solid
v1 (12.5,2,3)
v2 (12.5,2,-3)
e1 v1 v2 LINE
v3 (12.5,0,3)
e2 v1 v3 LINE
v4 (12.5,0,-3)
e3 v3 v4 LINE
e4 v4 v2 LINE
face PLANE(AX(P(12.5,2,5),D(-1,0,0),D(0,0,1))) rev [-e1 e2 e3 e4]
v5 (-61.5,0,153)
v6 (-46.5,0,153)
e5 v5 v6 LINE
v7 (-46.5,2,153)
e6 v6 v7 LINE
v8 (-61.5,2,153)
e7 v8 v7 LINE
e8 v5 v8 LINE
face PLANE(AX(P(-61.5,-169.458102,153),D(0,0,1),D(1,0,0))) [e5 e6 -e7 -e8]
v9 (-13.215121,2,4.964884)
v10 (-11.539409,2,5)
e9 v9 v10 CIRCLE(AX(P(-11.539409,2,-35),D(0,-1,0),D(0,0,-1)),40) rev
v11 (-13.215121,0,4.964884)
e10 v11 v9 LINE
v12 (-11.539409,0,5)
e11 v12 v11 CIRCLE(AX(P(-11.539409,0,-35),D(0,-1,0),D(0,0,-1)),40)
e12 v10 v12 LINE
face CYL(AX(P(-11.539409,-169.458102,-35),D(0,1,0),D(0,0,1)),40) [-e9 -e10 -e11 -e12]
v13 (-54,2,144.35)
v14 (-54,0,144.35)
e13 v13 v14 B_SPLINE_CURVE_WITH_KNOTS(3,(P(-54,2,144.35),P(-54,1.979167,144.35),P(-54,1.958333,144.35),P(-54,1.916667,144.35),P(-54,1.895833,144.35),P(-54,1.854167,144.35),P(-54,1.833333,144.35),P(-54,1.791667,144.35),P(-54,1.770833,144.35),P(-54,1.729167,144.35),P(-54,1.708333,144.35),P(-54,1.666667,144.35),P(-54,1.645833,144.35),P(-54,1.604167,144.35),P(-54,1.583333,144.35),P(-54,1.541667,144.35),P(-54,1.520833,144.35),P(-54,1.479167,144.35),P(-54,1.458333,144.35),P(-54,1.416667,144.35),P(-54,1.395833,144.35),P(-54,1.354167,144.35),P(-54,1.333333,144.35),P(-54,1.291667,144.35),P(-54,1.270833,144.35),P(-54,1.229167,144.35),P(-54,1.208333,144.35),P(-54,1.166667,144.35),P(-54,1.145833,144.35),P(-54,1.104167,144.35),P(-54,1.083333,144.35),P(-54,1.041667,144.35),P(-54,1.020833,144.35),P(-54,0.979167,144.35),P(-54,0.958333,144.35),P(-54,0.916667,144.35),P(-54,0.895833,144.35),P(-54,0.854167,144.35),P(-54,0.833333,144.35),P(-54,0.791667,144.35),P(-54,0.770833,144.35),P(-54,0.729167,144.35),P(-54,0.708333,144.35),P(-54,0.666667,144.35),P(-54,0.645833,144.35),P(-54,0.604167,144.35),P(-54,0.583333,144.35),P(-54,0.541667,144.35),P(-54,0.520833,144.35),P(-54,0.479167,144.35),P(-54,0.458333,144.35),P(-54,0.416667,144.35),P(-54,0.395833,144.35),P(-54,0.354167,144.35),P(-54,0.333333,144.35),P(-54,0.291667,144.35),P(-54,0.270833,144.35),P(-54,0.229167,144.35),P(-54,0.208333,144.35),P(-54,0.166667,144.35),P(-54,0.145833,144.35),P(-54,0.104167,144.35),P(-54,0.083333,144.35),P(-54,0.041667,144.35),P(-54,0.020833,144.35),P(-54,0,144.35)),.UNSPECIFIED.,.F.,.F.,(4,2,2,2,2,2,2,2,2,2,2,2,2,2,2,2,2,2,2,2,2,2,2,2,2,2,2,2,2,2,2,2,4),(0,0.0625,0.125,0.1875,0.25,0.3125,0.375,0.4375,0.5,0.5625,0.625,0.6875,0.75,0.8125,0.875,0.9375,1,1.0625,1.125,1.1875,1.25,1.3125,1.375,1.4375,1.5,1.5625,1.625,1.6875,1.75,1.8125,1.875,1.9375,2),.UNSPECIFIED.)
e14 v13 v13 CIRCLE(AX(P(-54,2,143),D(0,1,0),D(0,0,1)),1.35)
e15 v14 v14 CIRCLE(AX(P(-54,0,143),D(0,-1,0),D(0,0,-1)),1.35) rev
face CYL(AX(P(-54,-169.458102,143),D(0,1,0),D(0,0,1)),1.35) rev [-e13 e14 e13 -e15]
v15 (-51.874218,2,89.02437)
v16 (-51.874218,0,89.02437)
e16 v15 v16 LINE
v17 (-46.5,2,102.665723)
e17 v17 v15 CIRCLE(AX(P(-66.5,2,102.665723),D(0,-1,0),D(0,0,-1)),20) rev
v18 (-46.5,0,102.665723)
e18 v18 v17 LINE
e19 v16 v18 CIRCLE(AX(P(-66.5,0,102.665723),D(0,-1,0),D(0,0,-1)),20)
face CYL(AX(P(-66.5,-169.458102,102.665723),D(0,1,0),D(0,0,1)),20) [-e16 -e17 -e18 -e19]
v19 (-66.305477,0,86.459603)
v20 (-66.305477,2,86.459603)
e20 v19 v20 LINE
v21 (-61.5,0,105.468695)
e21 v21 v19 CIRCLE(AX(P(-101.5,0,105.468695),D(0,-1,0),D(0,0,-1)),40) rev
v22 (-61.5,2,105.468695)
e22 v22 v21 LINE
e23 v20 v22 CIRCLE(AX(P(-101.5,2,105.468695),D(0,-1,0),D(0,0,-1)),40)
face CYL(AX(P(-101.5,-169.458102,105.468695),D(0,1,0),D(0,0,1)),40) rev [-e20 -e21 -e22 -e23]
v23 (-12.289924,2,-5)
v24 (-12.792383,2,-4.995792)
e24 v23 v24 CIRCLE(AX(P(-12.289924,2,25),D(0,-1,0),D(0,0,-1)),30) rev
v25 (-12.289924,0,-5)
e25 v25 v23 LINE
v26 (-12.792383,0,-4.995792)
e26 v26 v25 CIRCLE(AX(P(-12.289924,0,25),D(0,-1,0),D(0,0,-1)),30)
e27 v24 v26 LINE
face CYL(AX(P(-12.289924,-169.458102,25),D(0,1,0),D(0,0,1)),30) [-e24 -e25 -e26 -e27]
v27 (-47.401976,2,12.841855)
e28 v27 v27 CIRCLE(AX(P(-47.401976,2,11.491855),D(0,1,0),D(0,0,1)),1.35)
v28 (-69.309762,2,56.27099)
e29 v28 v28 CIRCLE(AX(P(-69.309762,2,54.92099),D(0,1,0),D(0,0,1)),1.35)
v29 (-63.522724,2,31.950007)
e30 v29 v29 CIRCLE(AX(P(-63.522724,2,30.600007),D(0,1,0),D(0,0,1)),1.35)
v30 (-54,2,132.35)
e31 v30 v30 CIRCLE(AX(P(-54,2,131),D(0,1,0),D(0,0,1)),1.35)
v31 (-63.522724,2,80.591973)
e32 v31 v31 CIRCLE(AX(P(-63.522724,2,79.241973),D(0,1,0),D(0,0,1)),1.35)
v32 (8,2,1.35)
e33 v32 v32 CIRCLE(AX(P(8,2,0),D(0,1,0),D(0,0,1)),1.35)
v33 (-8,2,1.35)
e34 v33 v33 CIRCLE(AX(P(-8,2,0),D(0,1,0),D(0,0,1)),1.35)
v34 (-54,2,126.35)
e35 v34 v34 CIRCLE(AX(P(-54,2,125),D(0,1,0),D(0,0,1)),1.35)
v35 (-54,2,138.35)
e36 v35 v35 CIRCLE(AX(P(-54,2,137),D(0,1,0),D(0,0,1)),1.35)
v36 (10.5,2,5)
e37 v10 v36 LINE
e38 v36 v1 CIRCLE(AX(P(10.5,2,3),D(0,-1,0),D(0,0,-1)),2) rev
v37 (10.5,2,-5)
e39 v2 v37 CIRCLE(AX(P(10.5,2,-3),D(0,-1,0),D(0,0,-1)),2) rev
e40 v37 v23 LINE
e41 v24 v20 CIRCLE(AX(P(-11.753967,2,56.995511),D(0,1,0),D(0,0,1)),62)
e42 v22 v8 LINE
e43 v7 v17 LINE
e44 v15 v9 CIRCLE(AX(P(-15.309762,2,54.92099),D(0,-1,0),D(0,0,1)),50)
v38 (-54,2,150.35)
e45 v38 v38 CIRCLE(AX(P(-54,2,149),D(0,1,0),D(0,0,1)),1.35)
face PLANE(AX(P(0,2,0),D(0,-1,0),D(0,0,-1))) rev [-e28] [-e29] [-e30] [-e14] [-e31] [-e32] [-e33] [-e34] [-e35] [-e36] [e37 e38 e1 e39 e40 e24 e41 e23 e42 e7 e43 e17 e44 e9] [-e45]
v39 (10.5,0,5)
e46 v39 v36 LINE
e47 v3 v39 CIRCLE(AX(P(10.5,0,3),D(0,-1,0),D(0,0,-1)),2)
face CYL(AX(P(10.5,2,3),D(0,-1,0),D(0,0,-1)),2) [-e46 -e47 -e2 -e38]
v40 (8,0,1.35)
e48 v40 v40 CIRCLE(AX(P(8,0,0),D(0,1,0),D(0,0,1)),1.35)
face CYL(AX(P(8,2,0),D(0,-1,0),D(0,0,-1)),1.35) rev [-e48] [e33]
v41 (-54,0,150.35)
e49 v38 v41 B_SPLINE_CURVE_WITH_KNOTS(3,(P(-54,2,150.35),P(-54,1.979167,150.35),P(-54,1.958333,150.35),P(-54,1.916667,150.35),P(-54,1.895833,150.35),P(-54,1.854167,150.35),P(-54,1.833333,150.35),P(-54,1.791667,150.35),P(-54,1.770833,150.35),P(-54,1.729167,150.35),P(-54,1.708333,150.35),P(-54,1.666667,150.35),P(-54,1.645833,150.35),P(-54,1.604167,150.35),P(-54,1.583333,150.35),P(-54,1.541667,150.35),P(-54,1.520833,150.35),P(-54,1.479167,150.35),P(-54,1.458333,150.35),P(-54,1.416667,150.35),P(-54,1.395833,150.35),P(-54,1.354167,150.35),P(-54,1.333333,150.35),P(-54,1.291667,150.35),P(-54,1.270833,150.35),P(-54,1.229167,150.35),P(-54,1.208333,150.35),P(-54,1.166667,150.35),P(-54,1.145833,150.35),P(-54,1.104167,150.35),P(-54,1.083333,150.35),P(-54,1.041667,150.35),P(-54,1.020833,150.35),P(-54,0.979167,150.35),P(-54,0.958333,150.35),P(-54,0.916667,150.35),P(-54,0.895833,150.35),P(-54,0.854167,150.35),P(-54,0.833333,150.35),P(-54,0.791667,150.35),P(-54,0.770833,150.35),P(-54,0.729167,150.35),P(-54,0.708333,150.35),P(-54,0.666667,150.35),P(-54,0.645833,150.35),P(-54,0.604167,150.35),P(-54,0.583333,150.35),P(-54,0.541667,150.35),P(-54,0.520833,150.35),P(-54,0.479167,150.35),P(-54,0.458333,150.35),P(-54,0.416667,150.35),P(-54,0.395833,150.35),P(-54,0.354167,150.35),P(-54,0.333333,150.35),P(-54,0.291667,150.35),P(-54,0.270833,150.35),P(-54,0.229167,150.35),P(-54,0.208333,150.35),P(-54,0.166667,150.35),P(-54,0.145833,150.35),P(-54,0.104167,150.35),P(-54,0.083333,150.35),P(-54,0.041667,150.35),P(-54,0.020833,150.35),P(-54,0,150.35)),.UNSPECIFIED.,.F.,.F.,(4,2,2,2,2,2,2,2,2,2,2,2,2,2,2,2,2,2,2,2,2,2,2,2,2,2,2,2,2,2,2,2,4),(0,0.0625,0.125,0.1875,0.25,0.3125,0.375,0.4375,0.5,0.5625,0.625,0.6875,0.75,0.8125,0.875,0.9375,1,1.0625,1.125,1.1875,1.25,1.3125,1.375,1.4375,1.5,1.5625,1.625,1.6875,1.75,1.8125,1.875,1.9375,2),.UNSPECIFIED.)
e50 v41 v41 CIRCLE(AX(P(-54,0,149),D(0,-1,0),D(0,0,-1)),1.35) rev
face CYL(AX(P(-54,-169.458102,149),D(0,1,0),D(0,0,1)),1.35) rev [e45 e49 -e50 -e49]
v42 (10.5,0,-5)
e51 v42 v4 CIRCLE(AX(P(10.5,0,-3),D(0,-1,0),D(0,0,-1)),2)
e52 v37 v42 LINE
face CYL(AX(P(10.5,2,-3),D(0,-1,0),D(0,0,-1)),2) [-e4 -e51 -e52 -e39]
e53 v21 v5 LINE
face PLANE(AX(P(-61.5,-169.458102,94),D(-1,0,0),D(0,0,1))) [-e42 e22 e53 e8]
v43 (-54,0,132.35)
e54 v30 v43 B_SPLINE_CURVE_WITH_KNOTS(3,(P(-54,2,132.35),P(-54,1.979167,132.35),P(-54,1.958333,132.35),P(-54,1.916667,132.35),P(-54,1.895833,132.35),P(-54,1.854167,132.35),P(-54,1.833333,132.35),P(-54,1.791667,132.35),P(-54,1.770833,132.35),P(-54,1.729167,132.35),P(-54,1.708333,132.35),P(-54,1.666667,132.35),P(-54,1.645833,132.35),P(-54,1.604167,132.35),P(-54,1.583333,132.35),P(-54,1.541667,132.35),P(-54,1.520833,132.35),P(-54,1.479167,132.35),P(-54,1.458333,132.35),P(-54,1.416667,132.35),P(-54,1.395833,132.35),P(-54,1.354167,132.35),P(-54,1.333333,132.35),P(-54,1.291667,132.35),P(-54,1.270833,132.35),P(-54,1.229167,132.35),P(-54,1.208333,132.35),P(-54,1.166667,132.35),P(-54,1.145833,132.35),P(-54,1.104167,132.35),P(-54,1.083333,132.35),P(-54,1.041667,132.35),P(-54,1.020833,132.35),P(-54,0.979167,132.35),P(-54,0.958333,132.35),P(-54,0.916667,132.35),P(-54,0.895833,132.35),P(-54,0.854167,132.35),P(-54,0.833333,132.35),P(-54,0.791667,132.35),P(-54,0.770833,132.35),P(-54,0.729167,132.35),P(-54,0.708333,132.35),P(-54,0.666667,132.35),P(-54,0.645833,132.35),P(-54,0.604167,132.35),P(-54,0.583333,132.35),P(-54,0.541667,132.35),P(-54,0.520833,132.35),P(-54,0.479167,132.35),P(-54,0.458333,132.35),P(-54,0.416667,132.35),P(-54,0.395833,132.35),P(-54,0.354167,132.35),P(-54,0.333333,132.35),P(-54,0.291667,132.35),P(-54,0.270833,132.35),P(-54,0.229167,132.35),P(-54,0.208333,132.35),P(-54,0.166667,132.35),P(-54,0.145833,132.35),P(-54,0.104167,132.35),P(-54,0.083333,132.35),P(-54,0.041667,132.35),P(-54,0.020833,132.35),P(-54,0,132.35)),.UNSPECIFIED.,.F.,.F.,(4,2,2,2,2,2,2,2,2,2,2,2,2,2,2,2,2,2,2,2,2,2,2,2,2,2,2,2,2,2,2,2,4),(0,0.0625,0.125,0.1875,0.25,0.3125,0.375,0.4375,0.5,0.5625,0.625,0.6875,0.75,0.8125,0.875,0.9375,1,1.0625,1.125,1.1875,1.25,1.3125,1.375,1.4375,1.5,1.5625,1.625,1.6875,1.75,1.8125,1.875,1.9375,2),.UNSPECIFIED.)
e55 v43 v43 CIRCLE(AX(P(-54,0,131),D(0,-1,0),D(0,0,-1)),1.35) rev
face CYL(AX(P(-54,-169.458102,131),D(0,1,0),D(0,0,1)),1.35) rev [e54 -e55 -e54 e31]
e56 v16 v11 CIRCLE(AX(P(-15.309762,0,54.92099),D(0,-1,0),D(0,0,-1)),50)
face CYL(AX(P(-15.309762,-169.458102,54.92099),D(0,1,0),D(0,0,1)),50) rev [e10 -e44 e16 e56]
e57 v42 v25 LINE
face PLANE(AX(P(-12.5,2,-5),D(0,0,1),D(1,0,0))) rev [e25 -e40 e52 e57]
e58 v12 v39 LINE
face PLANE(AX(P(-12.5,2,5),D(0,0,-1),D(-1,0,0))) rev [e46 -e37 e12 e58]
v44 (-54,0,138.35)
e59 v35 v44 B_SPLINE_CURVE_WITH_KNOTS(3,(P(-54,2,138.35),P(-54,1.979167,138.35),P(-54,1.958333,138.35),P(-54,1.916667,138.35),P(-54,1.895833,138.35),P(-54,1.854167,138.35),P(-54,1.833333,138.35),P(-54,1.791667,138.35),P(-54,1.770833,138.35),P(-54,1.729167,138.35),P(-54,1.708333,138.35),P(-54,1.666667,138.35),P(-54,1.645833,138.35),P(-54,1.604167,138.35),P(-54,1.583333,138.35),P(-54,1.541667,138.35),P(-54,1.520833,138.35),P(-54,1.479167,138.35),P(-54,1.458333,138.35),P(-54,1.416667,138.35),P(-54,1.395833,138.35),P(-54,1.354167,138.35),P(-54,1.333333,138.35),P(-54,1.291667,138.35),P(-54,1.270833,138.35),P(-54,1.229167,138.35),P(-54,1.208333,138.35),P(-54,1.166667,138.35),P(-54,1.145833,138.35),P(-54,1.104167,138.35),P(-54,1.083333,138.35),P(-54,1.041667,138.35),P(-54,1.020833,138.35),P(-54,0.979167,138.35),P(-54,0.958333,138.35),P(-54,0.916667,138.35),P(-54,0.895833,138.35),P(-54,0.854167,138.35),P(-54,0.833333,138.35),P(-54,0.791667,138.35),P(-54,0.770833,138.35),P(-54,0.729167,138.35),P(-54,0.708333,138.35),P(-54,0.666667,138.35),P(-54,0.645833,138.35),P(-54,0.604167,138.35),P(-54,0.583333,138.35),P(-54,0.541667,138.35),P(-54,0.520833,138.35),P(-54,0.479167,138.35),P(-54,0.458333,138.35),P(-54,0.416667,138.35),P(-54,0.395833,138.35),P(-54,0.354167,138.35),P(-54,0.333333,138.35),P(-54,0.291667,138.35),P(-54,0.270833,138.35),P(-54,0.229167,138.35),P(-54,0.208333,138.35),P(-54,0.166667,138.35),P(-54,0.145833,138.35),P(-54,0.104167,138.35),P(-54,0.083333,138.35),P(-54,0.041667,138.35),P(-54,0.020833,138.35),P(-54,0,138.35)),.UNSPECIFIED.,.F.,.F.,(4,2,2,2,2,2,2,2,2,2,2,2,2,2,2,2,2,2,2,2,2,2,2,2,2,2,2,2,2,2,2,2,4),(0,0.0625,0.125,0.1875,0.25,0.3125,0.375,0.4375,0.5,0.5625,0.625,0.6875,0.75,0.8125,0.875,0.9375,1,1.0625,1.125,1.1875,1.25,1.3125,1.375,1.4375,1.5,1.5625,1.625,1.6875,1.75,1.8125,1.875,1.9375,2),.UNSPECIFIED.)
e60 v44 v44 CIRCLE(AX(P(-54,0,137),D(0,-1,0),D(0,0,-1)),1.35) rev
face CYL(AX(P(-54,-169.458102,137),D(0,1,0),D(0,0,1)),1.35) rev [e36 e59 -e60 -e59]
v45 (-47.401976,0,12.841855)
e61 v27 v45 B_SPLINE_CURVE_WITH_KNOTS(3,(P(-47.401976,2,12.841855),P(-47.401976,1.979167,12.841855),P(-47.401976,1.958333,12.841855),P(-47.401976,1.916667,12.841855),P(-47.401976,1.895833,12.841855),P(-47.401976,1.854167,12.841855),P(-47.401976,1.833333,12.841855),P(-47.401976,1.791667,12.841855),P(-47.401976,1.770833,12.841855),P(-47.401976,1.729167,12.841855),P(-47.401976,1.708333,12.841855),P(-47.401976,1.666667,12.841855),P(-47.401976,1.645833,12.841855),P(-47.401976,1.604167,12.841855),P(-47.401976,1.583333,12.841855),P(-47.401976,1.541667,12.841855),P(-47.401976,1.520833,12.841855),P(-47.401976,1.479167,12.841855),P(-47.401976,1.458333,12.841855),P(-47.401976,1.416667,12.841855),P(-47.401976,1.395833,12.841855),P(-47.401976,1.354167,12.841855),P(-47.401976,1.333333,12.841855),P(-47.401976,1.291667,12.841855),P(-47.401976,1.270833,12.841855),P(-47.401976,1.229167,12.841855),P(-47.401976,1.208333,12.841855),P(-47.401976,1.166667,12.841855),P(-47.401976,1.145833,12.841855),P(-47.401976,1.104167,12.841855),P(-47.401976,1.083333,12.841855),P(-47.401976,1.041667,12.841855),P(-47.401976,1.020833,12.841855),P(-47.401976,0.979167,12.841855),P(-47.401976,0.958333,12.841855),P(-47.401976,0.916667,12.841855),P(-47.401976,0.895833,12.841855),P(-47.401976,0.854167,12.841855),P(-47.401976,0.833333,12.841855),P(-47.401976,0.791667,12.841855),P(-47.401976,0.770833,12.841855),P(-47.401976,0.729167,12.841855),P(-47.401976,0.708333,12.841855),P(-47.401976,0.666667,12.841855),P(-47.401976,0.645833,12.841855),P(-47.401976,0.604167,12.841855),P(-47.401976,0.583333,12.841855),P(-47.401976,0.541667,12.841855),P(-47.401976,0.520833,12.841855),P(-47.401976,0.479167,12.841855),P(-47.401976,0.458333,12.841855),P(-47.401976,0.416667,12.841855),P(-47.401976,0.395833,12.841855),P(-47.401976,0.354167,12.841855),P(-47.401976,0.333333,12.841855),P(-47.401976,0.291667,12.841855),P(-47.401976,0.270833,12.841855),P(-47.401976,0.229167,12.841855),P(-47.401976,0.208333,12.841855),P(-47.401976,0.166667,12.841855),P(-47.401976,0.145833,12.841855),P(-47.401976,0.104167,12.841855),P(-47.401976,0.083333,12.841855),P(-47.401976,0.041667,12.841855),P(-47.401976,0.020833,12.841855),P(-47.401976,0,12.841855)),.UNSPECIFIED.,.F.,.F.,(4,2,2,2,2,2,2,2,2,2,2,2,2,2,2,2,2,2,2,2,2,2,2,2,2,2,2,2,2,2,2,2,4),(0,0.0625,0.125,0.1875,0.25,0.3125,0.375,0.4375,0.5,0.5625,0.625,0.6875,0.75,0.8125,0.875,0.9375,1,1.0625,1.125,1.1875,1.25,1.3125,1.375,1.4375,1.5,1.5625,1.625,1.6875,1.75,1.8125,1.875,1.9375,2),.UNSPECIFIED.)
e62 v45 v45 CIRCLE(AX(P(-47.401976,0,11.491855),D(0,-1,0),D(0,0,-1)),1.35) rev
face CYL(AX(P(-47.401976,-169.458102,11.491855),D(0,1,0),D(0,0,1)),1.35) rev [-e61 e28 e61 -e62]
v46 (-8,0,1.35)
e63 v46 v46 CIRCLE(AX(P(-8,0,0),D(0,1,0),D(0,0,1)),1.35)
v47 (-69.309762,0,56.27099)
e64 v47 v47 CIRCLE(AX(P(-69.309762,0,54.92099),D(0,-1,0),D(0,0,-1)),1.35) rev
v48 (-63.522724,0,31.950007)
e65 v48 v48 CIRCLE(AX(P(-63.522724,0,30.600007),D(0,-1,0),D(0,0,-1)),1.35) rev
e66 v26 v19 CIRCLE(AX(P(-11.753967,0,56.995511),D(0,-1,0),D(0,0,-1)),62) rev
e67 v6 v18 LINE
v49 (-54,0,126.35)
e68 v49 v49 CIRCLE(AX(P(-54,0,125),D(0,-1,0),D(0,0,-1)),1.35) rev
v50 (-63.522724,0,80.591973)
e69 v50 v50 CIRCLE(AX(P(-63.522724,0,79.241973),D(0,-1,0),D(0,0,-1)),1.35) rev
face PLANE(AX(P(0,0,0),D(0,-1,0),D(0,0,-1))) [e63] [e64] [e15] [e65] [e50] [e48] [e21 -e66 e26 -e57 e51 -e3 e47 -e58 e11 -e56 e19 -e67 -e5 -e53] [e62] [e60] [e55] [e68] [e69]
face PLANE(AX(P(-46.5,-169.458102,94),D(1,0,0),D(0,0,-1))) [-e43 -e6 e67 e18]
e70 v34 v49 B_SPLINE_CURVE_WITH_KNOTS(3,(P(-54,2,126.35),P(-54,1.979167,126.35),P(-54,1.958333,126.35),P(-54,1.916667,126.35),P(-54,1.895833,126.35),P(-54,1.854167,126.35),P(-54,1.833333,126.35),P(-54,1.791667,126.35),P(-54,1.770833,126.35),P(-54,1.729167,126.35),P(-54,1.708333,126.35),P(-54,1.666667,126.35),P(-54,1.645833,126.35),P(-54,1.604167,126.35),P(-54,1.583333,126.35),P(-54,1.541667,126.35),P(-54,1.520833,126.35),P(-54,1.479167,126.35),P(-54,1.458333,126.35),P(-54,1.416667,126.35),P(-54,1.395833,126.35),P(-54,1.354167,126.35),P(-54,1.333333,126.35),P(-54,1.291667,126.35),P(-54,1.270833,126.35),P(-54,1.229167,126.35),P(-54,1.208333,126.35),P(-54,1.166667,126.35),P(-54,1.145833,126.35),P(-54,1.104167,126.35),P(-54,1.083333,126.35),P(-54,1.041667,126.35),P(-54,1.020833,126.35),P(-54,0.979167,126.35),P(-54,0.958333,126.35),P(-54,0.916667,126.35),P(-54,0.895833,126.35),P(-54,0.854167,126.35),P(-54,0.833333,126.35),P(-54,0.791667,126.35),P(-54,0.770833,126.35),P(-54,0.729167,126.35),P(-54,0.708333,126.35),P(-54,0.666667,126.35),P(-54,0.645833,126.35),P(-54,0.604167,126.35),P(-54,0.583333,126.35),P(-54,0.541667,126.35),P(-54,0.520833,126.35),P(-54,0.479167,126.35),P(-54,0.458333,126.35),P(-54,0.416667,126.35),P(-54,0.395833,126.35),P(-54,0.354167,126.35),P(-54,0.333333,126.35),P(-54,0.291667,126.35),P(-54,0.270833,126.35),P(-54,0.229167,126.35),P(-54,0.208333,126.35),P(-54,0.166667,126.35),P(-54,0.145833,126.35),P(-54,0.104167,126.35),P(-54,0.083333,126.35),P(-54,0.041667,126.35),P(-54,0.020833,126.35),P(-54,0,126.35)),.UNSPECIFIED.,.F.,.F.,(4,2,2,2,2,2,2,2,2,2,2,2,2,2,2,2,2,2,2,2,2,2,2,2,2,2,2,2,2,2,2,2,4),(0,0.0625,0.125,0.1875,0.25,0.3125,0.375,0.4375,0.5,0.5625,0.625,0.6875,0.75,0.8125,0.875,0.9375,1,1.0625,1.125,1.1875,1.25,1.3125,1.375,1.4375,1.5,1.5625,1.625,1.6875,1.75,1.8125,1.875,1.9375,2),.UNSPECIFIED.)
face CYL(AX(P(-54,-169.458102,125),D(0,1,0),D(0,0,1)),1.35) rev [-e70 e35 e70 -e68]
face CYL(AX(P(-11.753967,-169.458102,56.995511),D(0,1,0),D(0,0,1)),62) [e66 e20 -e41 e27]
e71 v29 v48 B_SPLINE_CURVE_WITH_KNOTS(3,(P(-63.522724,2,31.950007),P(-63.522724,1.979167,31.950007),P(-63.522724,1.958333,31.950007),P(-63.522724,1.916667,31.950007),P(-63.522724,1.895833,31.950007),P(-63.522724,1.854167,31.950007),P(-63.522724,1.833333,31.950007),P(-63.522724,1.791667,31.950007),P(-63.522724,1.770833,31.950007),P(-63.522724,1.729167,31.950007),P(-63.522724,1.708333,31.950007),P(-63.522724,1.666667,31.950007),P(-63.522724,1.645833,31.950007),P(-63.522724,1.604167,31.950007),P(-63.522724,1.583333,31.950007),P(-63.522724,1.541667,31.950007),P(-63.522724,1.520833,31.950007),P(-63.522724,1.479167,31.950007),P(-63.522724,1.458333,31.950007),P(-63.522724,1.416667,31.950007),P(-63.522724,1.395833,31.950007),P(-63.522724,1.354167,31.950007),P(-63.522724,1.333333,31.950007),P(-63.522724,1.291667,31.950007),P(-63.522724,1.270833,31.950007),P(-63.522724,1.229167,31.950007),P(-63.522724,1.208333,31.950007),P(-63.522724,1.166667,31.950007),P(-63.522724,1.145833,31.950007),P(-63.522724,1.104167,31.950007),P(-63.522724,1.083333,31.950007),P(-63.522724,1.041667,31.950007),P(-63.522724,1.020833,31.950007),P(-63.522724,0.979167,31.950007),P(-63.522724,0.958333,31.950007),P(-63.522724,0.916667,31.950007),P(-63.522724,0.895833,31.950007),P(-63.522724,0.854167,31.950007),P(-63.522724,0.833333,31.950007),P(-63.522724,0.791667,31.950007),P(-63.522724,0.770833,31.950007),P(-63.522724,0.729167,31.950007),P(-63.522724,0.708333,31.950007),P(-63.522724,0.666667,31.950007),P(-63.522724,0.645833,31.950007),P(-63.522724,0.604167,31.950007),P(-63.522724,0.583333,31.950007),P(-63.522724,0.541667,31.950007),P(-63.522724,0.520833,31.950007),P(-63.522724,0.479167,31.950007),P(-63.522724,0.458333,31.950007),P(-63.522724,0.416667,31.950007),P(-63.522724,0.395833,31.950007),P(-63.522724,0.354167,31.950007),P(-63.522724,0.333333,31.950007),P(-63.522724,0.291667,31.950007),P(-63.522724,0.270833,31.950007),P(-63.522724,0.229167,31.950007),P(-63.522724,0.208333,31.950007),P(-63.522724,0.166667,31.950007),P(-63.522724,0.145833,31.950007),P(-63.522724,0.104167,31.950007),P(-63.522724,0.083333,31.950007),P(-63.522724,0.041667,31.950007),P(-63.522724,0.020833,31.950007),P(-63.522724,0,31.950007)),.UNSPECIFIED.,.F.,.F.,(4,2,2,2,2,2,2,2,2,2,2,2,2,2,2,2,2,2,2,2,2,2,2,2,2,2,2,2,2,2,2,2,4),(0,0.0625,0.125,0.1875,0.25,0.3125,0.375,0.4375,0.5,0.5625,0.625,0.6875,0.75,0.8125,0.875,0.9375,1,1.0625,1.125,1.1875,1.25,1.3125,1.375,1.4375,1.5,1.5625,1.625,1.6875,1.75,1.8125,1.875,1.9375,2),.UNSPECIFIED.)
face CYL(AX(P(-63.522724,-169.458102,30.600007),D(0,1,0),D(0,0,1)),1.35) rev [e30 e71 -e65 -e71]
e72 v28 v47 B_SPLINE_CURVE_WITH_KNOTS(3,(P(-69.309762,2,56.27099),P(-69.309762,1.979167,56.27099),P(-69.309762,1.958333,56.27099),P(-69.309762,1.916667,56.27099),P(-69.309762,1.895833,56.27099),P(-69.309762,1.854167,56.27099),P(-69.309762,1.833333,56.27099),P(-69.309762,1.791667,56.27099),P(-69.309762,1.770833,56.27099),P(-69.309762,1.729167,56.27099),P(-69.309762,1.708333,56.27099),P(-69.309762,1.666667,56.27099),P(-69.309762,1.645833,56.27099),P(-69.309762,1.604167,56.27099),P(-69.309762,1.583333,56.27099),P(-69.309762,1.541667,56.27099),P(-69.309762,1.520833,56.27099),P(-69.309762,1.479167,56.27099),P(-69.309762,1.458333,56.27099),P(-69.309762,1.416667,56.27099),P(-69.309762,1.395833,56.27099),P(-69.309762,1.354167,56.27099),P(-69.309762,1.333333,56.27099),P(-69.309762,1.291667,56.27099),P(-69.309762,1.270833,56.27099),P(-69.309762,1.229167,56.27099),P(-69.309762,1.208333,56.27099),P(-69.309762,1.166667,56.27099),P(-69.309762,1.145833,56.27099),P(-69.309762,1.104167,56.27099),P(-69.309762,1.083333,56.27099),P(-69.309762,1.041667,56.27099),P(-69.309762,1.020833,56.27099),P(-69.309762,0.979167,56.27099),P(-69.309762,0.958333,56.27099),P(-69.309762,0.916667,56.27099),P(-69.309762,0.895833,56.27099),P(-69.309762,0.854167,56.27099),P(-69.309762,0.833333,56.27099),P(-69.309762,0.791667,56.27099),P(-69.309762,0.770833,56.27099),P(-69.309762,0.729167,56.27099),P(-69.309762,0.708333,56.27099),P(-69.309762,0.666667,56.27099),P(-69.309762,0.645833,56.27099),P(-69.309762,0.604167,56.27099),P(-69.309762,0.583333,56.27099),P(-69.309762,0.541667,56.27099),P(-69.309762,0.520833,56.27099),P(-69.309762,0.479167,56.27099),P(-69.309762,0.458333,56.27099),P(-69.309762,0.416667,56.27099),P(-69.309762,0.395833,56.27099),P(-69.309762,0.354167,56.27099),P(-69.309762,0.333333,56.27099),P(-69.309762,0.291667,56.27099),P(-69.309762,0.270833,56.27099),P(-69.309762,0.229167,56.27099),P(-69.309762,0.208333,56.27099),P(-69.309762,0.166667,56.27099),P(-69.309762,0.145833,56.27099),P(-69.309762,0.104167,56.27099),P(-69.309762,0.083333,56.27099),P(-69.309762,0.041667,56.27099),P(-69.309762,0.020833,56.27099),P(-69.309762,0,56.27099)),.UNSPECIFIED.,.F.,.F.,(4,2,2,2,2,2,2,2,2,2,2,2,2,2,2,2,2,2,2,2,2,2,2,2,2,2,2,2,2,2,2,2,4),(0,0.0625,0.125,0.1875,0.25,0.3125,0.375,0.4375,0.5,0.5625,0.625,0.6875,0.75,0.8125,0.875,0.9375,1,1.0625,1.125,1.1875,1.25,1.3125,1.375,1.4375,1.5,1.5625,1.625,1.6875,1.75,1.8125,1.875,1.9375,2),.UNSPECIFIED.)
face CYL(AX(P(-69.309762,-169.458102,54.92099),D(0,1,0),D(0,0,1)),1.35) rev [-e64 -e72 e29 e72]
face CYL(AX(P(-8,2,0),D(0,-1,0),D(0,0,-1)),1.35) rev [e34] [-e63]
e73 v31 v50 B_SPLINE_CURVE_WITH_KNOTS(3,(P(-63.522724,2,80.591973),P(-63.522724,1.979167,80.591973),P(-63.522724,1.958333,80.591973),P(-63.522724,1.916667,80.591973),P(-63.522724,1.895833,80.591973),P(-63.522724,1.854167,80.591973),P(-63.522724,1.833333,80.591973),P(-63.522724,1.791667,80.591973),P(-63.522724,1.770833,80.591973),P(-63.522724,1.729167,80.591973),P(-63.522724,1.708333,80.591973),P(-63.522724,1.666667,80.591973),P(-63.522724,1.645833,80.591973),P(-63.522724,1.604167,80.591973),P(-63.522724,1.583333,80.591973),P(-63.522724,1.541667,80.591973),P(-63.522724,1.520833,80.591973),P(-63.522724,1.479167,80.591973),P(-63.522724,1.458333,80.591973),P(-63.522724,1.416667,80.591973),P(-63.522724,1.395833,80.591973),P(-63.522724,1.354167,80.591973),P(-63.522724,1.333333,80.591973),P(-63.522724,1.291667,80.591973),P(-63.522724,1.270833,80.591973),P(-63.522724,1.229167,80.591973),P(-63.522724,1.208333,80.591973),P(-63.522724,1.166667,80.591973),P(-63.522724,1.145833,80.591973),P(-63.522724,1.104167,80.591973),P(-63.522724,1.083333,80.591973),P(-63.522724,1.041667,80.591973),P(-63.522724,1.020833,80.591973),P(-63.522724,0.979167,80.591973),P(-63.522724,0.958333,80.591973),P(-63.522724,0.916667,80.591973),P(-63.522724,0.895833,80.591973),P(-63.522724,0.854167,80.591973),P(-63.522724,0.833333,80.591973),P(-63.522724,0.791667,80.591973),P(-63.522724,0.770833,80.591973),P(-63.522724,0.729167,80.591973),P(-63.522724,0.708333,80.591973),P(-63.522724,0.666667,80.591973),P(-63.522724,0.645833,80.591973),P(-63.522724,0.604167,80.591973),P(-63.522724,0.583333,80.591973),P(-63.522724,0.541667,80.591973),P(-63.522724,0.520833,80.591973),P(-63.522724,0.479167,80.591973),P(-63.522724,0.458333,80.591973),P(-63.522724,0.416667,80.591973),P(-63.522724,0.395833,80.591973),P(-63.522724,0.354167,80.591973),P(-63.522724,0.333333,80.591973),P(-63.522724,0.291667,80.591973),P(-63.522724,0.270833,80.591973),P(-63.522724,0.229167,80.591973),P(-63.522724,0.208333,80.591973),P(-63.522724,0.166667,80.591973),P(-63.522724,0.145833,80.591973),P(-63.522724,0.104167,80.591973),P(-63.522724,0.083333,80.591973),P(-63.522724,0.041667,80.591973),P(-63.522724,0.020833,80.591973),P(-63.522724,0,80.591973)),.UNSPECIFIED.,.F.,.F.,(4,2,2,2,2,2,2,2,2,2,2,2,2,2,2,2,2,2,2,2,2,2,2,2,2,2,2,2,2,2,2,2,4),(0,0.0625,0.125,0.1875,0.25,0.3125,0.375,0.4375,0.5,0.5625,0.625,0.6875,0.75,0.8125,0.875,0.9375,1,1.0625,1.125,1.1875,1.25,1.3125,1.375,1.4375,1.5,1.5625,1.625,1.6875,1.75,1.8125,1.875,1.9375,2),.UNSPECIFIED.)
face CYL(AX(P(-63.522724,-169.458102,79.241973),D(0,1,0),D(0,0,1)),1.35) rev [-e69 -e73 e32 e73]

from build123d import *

# Parameters (mm, degrees)
SKETCH_1_W      = 25
SKETCH_1_H      = 10
SKETCH_1_R      = 1.35
EXTRUDE_1_DEPTH = 2
SKETCH_3_R      = 1.35
EXTRUDE_2_DEPTH = 2
FILLET_2_R      = 40
FILLET_2_R_2    = 20
FILLET_2_R_3    = 30
FILLET_4_R      = 2


with BuildPart() as part:
    # 草图1 → 凸台-拉伸1 (new body)
    with BuildSketch(Plane(origin=(0, 0, 0), x_dir=(1, 0, 0), z_dir=(0, 1, 0))):
        Rectangle(SKETCH_1_W, SKETCH_1_H)
        with Locations(Location((8, 0, 0), (0, 0, 270))):
            Circle(SKETCH_1_R, mode=Mode.SUBTRACT)
        with Locations(Location((-8, 0, 0), (0, 0, 270))):
            Circle(SKETCH_1_R, mode=Mode.SUBTRACT)
    extrude(amount=EXTRUDE_1_DEPTH)

    # 草图3 → 凸台-拉伸2 (add)
    with BuildSketch(Plane(origin=(0, 2, 0), x_dir=(1, 0, 0), z_dir=(0, 1, 0))):
        with BuildLine():
            Line((-12.5, 5), (-12.5, -5))
            ThreePointArc((-12.5, -5), (-62.017500377, -37.077584126), (-46.5, -94))
            Line((-46.5, -94), (-46.5, -153))
            Line((-46.5, -153), (-61.5, -153))
            Line((-61.5, -153), (-61.5, -94))
            ThreePointArc((-61.5, -94), (-67.320253247, -29.493005969), (-12.5, 5))
        make_face()
        with Locations(Location((-54, -149, 0), (0, 0, 270))):
            Circle(SKETCH_3_R, mode=Mode.SUBTRACT)
        with Locations(Location((-63.522724498, -79.241972734, 0), (0, 0, 270))):
            Circle(SKETCH_3_R, mode=Mode.SUBTRACT)
        with Locations(Location((-47.401976264, -11.491855125, 0), (0, 0, 270))):
            Circle(SKETCH_3_R, mode=Mode.SUBTRACT)
        with Locations(Location((-69.309761535, -54.920989975, 0), (0, 0, 270))):
            Circle(SKETCH_3_R, mode=Mode.SUBTRACT)
        with Locations(Location((-63.522724498, -30.600007217, 0), (0, 0, 270))):
            Circle(SKETCH_3_R, mode=Mode.SUBTRACT)
        with Locations(Location((-54, -143, 0), (0, 0, 270))):
            Circle(SKETCH_3_R, mode=Mode.SUBTRACT)
        with Locations(Location((-54, -137, 0), (0, 0, 270))):
            Circle(SKETCH_3_R, mode=Mode.SUBTRACT)
        with Locations(Location((-54, -131, 0), (0, 0, 270))):
            Circle(SKETCH_3_R, mode=Mode.SUBTRACT)
        with Locations(Location((-54, -125, 0), (0, 0, 270))):
            Circle(SKETCH_3_R, mode=Mode.SUBTRACT)
    extrude(amount=-EXTRUDE_2_DEPTH)

    # 圆角2
    # the kernel refuses this fillet: 40, 30, 20 mm, written as the material it adds along each edge
    with BuildSketch(Plane(origin=(-61.5, 2, 94), x_dir=(0, 0, 1), z_dir=(0, -1, 0))) as fillet_2_piece_1:
        with BuildLine():
            CenterArc((11.468694882, 40), FILLET_2_R, 241.625850179, 28.374149821)
            ThreePointArc((-7.540396677, 4.805477158), (-3.683456175, 2.538847918), (0, 0))
            Line((0, 0), (11.468694882, 0))
        make_face()
    extrude(amount=2)
    # the kernel refuses this fillet: 40, 30, 20 mm, written as the material it takes off along each edge
    with BuildSketch(Plane(origin=(-46.5, 23.664306304, 94), x_dir=(-0.733794554453268, 0, -0.6793714387981952), z_dir=(0, -1, 0))) as fillet_2_2_piece_1:
        with BuildLine():
            CenterArc((8.788646711, -19.946288773), FILLET_2_R_2, 94.200030188, 43.005425253)
            Line((-5.887244378, -6.358859997), (0, 0))
            ThreePointArc((0, 0), (3.66193613, -0.134278068), (7.323872259, 0))
        make_face()
    extrude(amount=45.328612608, mode=Mode.SUBTRACT)
    with BuildSketch(Plane(origin=(-12.5, -2.4014787, 5), x_dir=(1, 0, 0), z_dir=(0, 1, 0))) as fillet_2_2_piece_2:
        with BuildLine():
            CenterArc((0.96059148, 40), FILLET_2_R, 267.599016081, 2.400983919)
            ThreePointArc((-0.715120971, 0.035115567), (-0.357497629, 0.018837835), (0, 0))
            Line((0, 0), (0.96059148, 0))
        make_face()
    extrude(amount=6.8029574, mode=Mode.SUBTRACT)
    with BuildSketch(Plane(origin=(-12.5, -0.73103436, -5), x_dir=(1, 0, 0), z_dir=(0, 1, 0))) as fillet_2_2_piece_3:
        with BuildLine():
            CenterArc((0.210076235, -30), FILLET_2_R_3, 90, 0.959672209)
            ThreePointArc((-0.292383464, -0.004208058), (-0.146194213, -0.001931656), (0, 0))
            Line((0, 0), (0.210076235, 0))
        make_face()
    extrude(amount=3.462068721, mode=Mode.SUBTRACT)

    # 圆角4
    fillet_4_edges = [part.edges().sort_by_distance(p)[0] for p in [
        (12.5, 1, 5),
        (12.5, 1, -5),
    ]]
    fillet(fillet_4_edges, radius=FILLET_4_R)


solid = part.part
